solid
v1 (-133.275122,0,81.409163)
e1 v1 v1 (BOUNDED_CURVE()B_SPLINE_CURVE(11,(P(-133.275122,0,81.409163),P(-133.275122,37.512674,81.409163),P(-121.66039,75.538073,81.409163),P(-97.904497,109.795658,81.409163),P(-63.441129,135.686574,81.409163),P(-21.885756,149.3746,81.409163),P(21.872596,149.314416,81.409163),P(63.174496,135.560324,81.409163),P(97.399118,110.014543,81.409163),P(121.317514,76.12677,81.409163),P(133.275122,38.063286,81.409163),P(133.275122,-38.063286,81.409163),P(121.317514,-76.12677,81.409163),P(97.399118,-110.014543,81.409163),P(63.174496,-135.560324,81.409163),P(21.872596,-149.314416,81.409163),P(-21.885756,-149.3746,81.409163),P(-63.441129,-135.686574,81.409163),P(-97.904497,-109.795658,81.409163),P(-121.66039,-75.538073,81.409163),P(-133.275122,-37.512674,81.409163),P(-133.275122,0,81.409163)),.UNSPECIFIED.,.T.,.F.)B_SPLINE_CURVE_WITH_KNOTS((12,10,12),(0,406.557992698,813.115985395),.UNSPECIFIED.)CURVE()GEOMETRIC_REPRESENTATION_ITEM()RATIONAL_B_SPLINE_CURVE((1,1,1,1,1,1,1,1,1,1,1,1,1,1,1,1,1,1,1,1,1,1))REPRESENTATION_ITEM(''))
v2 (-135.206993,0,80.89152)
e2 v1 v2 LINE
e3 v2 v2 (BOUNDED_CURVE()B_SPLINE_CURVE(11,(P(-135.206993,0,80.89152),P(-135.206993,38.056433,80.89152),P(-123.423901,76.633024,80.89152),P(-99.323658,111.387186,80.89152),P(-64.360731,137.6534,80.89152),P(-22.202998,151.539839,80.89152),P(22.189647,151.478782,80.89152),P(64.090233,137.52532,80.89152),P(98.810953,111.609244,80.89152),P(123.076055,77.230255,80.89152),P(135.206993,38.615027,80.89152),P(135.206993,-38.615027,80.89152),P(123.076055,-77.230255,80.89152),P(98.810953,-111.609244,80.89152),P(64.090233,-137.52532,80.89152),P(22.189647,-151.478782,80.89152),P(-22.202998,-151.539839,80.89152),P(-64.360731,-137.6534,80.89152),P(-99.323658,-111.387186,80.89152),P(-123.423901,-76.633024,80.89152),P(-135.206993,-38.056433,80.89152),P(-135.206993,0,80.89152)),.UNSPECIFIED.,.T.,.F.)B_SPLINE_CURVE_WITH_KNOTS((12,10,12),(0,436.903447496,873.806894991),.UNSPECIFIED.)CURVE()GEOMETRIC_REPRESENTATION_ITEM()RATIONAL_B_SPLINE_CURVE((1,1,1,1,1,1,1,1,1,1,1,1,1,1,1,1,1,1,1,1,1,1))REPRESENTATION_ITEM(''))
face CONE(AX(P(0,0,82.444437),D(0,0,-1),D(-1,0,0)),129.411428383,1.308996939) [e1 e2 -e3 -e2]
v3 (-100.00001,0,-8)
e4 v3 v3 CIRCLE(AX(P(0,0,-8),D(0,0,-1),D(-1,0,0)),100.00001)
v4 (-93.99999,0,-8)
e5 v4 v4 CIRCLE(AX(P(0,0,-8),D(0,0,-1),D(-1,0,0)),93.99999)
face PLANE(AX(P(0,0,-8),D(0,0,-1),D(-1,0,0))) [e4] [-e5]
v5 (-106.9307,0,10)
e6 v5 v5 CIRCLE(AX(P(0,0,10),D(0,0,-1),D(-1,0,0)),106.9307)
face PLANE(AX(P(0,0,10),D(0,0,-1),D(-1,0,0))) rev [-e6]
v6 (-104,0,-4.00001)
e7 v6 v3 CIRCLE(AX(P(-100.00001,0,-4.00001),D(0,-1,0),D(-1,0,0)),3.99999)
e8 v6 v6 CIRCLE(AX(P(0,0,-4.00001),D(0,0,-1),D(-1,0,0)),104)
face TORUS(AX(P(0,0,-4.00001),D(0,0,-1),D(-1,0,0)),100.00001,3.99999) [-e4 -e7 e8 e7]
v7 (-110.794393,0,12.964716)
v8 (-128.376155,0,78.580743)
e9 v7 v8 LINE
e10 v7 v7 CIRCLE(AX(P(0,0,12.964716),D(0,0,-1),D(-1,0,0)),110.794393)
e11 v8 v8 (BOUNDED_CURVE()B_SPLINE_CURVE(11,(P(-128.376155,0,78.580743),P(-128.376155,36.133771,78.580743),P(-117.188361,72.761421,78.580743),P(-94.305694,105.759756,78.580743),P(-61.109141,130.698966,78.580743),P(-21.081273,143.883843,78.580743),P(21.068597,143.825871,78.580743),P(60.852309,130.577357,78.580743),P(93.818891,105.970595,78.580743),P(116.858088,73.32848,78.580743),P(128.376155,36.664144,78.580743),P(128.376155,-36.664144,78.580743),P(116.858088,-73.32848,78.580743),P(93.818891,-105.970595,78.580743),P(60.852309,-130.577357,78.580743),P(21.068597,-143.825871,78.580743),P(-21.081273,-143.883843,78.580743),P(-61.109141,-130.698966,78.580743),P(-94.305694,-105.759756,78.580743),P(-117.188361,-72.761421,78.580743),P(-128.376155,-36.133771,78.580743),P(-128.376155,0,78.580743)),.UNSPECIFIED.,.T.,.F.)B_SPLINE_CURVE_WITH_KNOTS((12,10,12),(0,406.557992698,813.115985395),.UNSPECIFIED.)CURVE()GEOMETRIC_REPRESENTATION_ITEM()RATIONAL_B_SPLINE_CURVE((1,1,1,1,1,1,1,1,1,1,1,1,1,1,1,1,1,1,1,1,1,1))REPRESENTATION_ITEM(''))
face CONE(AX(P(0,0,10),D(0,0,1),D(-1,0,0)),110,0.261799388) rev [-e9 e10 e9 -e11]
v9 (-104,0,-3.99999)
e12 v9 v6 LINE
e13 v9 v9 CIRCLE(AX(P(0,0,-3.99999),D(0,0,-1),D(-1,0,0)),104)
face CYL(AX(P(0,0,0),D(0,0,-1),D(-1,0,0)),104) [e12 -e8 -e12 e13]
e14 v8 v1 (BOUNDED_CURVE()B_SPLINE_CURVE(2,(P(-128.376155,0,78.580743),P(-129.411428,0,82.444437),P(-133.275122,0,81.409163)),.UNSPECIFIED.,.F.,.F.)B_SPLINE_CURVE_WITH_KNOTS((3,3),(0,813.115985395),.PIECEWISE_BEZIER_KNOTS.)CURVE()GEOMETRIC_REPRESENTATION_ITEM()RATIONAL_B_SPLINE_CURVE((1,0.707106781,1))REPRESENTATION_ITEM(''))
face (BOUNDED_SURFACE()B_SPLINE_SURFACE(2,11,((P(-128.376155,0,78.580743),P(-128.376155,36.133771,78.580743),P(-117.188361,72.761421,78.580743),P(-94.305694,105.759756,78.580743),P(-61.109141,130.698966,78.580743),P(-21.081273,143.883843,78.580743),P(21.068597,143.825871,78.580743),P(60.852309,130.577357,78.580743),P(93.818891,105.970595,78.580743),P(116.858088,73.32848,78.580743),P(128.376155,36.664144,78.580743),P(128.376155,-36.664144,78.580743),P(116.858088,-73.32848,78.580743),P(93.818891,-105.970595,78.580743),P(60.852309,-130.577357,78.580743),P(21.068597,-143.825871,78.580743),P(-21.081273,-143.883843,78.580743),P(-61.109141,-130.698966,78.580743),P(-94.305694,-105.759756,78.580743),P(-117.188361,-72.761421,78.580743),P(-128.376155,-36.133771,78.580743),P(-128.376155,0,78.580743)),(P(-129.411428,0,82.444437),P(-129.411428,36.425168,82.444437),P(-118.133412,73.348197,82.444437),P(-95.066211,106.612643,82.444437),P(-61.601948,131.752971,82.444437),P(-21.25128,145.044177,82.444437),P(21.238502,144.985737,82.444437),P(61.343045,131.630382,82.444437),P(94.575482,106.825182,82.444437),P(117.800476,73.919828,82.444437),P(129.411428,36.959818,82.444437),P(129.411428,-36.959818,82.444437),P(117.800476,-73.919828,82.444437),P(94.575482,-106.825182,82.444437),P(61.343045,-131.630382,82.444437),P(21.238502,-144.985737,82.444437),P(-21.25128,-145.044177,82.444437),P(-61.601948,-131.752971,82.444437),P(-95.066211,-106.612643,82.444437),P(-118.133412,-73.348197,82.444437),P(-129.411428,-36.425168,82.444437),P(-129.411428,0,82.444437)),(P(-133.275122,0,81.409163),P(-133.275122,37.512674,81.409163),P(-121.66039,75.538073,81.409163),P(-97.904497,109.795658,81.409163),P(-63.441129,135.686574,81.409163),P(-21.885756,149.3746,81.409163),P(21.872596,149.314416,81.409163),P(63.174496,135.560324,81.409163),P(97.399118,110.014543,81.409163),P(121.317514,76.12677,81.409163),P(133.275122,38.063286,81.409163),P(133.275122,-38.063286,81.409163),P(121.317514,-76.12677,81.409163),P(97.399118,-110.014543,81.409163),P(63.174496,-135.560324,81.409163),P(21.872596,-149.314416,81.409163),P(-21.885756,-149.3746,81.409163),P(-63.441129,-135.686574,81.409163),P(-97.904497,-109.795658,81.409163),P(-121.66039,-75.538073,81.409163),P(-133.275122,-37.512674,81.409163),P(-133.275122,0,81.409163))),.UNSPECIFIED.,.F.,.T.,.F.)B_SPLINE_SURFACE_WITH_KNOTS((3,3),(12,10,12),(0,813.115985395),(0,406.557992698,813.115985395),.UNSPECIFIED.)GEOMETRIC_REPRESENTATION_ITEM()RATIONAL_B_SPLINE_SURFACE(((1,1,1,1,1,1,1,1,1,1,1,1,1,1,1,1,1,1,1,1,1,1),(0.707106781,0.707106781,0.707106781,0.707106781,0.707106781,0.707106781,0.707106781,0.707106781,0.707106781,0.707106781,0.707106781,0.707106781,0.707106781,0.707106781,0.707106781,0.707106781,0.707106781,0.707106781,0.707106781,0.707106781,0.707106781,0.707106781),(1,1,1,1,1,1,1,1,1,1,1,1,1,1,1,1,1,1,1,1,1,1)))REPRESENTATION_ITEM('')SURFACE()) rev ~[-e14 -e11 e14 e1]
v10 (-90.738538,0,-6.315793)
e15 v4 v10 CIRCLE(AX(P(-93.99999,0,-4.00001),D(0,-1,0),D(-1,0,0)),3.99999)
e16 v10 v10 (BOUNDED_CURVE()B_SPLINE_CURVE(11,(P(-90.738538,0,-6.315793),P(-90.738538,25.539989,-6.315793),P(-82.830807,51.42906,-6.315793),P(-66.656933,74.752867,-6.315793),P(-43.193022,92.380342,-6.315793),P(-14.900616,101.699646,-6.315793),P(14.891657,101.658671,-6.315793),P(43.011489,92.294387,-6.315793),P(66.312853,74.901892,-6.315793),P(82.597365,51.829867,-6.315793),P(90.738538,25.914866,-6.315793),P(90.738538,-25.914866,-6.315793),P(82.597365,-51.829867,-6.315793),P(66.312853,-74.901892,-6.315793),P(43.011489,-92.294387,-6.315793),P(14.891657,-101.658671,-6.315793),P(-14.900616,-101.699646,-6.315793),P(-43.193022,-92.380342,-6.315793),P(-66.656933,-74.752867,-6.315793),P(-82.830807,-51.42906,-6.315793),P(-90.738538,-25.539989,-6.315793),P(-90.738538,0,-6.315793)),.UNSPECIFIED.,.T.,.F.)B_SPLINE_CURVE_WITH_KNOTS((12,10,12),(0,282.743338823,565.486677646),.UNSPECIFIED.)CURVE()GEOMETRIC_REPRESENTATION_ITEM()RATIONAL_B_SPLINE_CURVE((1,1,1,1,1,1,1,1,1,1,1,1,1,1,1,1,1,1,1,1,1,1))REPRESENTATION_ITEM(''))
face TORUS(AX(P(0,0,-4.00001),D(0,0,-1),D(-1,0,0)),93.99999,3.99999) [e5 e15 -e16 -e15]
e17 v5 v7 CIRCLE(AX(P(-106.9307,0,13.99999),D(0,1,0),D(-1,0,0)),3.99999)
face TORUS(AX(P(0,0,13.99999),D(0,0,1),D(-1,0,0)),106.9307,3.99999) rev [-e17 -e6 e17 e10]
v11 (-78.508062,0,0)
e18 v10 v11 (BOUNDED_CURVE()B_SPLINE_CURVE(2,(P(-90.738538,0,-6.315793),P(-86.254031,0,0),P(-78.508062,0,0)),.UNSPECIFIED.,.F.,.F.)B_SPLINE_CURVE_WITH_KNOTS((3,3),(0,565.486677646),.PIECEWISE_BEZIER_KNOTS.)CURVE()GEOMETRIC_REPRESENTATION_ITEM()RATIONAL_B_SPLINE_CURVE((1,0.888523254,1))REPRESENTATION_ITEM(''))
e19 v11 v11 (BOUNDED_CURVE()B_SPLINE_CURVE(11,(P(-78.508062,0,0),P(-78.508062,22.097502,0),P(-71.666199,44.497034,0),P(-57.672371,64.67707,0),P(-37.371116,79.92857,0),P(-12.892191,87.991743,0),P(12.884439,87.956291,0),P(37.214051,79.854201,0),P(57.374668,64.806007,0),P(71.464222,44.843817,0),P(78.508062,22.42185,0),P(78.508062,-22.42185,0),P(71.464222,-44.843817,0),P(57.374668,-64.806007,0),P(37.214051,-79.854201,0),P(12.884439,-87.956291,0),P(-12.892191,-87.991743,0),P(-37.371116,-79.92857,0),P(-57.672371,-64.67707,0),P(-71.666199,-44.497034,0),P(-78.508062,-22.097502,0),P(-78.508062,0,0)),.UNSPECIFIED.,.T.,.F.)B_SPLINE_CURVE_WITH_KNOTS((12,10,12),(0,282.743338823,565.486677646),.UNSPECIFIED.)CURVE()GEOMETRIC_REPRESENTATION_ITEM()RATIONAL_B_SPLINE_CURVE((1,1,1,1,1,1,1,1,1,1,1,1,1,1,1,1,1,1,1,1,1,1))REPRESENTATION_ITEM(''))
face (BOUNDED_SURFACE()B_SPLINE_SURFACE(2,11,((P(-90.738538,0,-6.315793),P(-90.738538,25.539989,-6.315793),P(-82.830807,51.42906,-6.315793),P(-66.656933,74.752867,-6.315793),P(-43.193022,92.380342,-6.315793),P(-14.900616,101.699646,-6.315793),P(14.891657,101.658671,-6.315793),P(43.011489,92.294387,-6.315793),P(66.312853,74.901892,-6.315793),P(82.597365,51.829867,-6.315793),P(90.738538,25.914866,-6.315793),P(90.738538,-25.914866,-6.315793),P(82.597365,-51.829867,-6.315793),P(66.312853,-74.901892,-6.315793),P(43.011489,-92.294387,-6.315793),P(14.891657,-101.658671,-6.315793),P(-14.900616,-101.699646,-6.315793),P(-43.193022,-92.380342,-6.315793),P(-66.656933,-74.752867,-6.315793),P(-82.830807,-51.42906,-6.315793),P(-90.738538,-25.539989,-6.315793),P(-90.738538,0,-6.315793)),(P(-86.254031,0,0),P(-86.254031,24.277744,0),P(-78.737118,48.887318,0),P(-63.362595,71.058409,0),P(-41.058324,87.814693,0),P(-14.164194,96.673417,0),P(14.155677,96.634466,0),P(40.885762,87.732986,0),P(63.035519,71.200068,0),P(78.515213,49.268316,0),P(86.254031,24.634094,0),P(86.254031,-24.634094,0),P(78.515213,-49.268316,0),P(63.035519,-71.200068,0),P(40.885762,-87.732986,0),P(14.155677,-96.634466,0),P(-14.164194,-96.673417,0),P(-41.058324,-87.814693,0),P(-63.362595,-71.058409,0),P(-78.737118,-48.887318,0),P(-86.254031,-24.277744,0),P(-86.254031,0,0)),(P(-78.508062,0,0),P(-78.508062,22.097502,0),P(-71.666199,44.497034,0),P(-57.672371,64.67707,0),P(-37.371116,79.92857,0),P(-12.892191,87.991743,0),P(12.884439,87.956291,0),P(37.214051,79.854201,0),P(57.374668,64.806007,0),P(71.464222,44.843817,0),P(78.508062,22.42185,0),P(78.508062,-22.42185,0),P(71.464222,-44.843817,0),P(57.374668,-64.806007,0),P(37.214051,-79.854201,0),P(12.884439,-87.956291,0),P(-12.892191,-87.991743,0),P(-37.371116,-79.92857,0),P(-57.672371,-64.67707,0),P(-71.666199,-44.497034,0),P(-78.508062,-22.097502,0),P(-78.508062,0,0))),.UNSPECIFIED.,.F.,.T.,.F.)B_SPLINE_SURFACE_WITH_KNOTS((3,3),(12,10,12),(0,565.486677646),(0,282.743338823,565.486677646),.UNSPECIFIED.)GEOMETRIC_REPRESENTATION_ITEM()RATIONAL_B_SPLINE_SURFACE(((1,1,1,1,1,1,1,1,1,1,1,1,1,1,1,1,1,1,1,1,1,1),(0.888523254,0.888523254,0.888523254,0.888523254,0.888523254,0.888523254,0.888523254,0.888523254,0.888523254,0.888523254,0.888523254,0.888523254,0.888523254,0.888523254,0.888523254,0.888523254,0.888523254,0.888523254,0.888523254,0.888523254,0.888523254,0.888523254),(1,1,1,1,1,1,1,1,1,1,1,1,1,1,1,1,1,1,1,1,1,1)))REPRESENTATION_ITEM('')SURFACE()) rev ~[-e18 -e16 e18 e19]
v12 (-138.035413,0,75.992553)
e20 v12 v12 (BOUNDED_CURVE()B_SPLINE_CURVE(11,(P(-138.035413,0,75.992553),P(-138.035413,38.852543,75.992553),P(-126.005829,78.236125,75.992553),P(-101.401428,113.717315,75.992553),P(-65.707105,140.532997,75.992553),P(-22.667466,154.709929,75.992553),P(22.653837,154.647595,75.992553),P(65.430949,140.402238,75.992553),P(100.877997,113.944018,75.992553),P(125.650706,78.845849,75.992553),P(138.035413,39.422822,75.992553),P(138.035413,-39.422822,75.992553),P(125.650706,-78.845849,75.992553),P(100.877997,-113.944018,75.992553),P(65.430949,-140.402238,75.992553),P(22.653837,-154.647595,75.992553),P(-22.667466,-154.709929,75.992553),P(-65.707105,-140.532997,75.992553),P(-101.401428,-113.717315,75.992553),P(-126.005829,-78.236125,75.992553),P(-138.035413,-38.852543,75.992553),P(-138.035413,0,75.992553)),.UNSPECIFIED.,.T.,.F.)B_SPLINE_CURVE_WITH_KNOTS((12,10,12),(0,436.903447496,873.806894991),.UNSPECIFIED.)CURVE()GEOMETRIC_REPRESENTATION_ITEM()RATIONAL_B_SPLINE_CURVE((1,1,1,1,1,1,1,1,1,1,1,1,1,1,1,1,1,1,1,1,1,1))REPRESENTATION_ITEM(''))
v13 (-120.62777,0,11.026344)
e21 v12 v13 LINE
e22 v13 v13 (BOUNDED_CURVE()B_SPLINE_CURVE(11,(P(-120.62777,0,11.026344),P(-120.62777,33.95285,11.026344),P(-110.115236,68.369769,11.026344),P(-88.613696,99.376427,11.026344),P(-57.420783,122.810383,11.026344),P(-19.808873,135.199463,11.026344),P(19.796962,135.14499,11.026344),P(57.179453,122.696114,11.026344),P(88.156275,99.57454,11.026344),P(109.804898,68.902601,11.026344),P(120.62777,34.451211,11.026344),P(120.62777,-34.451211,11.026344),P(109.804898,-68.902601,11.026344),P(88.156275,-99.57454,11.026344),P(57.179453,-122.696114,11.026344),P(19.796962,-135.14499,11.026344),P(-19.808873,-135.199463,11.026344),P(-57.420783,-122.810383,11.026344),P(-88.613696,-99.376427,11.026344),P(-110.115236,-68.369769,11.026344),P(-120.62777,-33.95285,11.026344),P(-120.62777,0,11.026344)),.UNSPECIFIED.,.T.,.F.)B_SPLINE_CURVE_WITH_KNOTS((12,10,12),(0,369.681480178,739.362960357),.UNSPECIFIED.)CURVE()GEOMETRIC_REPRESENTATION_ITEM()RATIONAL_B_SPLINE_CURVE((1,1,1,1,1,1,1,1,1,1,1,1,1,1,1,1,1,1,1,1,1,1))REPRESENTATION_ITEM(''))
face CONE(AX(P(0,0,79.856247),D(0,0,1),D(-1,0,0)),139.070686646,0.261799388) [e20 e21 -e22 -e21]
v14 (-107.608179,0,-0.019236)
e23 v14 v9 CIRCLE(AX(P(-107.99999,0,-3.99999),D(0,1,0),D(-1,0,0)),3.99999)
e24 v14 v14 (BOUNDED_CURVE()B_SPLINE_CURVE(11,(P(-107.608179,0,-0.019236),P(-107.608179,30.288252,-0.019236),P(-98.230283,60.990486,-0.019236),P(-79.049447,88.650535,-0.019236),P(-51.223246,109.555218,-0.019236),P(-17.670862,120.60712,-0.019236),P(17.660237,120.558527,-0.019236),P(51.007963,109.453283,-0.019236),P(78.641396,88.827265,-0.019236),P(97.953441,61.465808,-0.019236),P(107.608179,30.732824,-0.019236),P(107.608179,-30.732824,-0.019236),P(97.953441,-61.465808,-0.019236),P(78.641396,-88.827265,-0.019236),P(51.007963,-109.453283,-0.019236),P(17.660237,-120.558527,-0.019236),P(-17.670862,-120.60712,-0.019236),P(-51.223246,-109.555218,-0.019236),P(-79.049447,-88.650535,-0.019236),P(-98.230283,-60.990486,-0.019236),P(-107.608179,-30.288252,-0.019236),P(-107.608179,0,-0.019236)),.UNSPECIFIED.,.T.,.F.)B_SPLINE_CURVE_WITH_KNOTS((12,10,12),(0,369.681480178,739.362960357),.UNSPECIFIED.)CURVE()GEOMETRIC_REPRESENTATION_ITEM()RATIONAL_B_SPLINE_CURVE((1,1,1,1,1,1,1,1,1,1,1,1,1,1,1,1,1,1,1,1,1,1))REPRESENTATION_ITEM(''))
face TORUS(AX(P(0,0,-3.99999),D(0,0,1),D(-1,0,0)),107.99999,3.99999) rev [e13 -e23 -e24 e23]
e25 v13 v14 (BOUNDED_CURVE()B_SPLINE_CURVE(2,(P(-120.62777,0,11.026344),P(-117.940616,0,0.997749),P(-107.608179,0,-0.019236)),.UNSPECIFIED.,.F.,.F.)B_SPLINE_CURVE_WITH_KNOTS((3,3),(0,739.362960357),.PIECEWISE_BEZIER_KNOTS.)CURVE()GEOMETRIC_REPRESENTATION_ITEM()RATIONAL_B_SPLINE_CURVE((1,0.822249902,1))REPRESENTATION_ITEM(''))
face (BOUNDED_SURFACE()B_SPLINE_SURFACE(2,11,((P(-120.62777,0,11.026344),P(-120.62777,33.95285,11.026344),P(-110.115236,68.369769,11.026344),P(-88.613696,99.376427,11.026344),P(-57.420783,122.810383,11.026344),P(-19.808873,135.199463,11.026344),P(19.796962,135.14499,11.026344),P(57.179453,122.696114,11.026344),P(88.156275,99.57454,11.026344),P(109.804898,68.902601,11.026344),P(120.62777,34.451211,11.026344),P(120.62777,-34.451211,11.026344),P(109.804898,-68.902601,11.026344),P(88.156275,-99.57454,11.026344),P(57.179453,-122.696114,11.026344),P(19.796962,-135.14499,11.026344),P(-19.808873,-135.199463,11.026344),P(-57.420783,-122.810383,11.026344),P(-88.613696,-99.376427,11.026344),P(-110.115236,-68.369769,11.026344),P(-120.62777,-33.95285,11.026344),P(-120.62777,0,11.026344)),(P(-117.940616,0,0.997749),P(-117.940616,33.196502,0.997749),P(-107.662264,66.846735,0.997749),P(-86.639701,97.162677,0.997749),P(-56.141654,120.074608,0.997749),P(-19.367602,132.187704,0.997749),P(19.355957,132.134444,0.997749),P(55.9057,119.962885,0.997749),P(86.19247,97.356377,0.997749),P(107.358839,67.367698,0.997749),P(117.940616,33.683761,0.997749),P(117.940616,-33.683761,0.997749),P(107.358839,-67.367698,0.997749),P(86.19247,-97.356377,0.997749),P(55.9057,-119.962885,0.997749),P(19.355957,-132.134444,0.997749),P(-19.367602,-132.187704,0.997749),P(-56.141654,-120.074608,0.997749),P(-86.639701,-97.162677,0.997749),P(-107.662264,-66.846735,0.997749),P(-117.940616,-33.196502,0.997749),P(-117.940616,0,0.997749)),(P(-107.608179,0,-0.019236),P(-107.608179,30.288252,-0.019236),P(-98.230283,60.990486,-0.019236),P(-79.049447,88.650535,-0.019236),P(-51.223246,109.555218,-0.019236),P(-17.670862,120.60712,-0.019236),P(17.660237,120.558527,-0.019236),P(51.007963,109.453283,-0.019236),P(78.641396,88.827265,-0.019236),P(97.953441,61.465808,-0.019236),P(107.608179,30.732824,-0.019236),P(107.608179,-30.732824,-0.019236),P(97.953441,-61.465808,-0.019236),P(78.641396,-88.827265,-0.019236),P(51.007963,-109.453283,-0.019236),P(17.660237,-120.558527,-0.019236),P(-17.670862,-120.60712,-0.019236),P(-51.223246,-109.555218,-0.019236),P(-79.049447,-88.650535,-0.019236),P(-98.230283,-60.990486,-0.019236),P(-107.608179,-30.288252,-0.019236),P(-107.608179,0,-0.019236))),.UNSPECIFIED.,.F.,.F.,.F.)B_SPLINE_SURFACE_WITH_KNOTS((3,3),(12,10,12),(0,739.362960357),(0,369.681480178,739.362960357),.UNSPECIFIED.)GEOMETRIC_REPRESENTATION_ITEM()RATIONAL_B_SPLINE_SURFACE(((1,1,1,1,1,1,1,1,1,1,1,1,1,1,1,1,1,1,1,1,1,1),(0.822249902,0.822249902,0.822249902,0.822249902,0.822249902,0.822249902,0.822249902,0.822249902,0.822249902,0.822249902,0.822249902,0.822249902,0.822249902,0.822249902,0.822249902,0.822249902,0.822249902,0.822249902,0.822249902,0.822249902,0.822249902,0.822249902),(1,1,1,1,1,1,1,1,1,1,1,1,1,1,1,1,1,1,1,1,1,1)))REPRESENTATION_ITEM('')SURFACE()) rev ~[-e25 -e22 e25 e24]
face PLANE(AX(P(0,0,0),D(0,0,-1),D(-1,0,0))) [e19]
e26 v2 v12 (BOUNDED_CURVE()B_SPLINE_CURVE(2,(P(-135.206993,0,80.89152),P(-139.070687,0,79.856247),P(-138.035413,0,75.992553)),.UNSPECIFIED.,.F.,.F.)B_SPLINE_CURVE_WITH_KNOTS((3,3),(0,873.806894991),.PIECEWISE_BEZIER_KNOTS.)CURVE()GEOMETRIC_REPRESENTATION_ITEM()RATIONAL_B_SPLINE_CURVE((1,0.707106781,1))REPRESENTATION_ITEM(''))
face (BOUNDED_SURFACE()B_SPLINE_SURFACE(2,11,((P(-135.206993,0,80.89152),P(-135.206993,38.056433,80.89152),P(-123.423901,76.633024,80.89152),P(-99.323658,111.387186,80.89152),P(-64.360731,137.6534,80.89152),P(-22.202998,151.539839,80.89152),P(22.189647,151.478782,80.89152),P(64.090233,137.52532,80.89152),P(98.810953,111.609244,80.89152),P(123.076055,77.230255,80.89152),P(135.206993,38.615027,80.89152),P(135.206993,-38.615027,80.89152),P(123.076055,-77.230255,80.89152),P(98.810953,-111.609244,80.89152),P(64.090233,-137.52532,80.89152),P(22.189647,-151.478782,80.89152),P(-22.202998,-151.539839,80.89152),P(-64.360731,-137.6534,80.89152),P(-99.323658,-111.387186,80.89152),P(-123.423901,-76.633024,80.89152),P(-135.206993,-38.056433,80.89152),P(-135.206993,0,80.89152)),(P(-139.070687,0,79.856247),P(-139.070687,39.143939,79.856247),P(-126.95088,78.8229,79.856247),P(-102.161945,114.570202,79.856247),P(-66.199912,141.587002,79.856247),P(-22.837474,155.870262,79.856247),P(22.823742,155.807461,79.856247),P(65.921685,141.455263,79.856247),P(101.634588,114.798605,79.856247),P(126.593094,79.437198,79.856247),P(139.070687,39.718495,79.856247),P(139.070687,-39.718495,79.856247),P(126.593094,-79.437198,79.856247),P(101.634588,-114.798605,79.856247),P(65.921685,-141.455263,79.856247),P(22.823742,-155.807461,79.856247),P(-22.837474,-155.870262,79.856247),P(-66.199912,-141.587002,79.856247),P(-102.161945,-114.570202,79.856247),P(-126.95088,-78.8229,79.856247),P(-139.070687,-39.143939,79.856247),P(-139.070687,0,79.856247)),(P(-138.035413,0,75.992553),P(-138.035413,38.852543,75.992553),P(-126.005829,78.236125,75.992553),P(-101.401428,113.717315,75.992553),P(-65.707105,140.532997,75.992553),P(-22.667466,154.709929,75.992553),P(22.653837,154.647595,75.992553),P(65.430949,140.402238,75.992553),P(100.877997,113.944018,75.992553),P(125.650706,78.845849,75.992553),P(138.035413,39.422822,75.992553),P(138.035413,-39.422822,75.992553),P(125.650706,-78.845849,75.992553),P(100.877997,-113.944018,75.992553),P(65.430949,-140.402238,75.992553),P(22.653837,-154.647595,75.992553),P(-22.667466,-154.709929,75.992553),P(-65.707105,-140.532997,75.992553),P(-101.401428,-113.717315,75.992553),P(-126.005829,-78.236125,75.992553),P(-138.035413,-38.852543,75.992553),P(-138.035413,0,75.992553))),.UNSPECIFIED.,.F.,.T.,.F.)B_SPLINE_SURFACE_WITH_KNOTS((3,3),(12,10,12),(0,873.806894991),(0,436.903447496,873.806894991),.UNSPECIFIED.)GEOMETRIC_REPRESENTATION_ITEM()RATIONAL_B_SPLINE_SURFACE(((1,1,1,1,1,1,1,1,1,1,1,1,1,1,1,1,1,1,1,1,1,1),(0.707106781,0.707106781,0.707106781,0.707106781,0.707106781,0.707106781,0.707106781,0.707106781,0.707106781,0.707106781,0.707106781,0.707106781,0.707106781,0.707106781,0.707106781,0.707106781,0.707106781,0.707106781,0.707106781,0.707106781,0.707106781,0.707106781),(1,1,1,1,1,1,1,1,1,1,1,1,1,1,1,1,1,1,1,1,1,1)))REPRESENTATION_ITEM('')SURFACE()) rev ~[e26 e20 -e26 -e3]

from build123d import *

# Parameters (mm, degrees)
F2_R = 3.99999
F3_R = 15


# Not quite as in the source:
# - a fillet or chamfer is up to 0.001 mm smaller than in the source, because OpenCascade refuses the exact size


with BuildPart() as f1:
    # F0 (on Front) → F1 (revolve)
    with BuildSketch(Plane.XZ):
        Polygon((-90, 0), (0, 0), (0, 10), (-110, 10), (-129.4114283827, 82.4444369717), (-139.0706866456, 79.8562465207), (-117.6732698798, 0), (-104, 0), (-104, -8), (-90, -8), align=None)
    revolve(axis=Axis((0, 0, 5), (0, 0, -1)))

    # F2 (radius 4 in the source; OpenCascade refuses exactly that, so slightly less here)
    f2_edges = [f1.edges().sort_by_distance(p)[0] for p in [
        (110, 0, 10),
        (129.411428, 0, 82.444437),
        (139.070687, 0, 79.856247),
        (104, 0, -8),
        (90, 0, -8),
        (104, 0, 0),
    ]]
    fillet(f2_edges, radius=F2_R)

    # F3
    f3_edges = [f1.edges().sort_by_distance(p)[0] for p in [
        (90, 0, 0),
        (117.67327, 0, 0),
    ]]
    fillet(f3_edges, radius=F3_R)


solid = f1.part
